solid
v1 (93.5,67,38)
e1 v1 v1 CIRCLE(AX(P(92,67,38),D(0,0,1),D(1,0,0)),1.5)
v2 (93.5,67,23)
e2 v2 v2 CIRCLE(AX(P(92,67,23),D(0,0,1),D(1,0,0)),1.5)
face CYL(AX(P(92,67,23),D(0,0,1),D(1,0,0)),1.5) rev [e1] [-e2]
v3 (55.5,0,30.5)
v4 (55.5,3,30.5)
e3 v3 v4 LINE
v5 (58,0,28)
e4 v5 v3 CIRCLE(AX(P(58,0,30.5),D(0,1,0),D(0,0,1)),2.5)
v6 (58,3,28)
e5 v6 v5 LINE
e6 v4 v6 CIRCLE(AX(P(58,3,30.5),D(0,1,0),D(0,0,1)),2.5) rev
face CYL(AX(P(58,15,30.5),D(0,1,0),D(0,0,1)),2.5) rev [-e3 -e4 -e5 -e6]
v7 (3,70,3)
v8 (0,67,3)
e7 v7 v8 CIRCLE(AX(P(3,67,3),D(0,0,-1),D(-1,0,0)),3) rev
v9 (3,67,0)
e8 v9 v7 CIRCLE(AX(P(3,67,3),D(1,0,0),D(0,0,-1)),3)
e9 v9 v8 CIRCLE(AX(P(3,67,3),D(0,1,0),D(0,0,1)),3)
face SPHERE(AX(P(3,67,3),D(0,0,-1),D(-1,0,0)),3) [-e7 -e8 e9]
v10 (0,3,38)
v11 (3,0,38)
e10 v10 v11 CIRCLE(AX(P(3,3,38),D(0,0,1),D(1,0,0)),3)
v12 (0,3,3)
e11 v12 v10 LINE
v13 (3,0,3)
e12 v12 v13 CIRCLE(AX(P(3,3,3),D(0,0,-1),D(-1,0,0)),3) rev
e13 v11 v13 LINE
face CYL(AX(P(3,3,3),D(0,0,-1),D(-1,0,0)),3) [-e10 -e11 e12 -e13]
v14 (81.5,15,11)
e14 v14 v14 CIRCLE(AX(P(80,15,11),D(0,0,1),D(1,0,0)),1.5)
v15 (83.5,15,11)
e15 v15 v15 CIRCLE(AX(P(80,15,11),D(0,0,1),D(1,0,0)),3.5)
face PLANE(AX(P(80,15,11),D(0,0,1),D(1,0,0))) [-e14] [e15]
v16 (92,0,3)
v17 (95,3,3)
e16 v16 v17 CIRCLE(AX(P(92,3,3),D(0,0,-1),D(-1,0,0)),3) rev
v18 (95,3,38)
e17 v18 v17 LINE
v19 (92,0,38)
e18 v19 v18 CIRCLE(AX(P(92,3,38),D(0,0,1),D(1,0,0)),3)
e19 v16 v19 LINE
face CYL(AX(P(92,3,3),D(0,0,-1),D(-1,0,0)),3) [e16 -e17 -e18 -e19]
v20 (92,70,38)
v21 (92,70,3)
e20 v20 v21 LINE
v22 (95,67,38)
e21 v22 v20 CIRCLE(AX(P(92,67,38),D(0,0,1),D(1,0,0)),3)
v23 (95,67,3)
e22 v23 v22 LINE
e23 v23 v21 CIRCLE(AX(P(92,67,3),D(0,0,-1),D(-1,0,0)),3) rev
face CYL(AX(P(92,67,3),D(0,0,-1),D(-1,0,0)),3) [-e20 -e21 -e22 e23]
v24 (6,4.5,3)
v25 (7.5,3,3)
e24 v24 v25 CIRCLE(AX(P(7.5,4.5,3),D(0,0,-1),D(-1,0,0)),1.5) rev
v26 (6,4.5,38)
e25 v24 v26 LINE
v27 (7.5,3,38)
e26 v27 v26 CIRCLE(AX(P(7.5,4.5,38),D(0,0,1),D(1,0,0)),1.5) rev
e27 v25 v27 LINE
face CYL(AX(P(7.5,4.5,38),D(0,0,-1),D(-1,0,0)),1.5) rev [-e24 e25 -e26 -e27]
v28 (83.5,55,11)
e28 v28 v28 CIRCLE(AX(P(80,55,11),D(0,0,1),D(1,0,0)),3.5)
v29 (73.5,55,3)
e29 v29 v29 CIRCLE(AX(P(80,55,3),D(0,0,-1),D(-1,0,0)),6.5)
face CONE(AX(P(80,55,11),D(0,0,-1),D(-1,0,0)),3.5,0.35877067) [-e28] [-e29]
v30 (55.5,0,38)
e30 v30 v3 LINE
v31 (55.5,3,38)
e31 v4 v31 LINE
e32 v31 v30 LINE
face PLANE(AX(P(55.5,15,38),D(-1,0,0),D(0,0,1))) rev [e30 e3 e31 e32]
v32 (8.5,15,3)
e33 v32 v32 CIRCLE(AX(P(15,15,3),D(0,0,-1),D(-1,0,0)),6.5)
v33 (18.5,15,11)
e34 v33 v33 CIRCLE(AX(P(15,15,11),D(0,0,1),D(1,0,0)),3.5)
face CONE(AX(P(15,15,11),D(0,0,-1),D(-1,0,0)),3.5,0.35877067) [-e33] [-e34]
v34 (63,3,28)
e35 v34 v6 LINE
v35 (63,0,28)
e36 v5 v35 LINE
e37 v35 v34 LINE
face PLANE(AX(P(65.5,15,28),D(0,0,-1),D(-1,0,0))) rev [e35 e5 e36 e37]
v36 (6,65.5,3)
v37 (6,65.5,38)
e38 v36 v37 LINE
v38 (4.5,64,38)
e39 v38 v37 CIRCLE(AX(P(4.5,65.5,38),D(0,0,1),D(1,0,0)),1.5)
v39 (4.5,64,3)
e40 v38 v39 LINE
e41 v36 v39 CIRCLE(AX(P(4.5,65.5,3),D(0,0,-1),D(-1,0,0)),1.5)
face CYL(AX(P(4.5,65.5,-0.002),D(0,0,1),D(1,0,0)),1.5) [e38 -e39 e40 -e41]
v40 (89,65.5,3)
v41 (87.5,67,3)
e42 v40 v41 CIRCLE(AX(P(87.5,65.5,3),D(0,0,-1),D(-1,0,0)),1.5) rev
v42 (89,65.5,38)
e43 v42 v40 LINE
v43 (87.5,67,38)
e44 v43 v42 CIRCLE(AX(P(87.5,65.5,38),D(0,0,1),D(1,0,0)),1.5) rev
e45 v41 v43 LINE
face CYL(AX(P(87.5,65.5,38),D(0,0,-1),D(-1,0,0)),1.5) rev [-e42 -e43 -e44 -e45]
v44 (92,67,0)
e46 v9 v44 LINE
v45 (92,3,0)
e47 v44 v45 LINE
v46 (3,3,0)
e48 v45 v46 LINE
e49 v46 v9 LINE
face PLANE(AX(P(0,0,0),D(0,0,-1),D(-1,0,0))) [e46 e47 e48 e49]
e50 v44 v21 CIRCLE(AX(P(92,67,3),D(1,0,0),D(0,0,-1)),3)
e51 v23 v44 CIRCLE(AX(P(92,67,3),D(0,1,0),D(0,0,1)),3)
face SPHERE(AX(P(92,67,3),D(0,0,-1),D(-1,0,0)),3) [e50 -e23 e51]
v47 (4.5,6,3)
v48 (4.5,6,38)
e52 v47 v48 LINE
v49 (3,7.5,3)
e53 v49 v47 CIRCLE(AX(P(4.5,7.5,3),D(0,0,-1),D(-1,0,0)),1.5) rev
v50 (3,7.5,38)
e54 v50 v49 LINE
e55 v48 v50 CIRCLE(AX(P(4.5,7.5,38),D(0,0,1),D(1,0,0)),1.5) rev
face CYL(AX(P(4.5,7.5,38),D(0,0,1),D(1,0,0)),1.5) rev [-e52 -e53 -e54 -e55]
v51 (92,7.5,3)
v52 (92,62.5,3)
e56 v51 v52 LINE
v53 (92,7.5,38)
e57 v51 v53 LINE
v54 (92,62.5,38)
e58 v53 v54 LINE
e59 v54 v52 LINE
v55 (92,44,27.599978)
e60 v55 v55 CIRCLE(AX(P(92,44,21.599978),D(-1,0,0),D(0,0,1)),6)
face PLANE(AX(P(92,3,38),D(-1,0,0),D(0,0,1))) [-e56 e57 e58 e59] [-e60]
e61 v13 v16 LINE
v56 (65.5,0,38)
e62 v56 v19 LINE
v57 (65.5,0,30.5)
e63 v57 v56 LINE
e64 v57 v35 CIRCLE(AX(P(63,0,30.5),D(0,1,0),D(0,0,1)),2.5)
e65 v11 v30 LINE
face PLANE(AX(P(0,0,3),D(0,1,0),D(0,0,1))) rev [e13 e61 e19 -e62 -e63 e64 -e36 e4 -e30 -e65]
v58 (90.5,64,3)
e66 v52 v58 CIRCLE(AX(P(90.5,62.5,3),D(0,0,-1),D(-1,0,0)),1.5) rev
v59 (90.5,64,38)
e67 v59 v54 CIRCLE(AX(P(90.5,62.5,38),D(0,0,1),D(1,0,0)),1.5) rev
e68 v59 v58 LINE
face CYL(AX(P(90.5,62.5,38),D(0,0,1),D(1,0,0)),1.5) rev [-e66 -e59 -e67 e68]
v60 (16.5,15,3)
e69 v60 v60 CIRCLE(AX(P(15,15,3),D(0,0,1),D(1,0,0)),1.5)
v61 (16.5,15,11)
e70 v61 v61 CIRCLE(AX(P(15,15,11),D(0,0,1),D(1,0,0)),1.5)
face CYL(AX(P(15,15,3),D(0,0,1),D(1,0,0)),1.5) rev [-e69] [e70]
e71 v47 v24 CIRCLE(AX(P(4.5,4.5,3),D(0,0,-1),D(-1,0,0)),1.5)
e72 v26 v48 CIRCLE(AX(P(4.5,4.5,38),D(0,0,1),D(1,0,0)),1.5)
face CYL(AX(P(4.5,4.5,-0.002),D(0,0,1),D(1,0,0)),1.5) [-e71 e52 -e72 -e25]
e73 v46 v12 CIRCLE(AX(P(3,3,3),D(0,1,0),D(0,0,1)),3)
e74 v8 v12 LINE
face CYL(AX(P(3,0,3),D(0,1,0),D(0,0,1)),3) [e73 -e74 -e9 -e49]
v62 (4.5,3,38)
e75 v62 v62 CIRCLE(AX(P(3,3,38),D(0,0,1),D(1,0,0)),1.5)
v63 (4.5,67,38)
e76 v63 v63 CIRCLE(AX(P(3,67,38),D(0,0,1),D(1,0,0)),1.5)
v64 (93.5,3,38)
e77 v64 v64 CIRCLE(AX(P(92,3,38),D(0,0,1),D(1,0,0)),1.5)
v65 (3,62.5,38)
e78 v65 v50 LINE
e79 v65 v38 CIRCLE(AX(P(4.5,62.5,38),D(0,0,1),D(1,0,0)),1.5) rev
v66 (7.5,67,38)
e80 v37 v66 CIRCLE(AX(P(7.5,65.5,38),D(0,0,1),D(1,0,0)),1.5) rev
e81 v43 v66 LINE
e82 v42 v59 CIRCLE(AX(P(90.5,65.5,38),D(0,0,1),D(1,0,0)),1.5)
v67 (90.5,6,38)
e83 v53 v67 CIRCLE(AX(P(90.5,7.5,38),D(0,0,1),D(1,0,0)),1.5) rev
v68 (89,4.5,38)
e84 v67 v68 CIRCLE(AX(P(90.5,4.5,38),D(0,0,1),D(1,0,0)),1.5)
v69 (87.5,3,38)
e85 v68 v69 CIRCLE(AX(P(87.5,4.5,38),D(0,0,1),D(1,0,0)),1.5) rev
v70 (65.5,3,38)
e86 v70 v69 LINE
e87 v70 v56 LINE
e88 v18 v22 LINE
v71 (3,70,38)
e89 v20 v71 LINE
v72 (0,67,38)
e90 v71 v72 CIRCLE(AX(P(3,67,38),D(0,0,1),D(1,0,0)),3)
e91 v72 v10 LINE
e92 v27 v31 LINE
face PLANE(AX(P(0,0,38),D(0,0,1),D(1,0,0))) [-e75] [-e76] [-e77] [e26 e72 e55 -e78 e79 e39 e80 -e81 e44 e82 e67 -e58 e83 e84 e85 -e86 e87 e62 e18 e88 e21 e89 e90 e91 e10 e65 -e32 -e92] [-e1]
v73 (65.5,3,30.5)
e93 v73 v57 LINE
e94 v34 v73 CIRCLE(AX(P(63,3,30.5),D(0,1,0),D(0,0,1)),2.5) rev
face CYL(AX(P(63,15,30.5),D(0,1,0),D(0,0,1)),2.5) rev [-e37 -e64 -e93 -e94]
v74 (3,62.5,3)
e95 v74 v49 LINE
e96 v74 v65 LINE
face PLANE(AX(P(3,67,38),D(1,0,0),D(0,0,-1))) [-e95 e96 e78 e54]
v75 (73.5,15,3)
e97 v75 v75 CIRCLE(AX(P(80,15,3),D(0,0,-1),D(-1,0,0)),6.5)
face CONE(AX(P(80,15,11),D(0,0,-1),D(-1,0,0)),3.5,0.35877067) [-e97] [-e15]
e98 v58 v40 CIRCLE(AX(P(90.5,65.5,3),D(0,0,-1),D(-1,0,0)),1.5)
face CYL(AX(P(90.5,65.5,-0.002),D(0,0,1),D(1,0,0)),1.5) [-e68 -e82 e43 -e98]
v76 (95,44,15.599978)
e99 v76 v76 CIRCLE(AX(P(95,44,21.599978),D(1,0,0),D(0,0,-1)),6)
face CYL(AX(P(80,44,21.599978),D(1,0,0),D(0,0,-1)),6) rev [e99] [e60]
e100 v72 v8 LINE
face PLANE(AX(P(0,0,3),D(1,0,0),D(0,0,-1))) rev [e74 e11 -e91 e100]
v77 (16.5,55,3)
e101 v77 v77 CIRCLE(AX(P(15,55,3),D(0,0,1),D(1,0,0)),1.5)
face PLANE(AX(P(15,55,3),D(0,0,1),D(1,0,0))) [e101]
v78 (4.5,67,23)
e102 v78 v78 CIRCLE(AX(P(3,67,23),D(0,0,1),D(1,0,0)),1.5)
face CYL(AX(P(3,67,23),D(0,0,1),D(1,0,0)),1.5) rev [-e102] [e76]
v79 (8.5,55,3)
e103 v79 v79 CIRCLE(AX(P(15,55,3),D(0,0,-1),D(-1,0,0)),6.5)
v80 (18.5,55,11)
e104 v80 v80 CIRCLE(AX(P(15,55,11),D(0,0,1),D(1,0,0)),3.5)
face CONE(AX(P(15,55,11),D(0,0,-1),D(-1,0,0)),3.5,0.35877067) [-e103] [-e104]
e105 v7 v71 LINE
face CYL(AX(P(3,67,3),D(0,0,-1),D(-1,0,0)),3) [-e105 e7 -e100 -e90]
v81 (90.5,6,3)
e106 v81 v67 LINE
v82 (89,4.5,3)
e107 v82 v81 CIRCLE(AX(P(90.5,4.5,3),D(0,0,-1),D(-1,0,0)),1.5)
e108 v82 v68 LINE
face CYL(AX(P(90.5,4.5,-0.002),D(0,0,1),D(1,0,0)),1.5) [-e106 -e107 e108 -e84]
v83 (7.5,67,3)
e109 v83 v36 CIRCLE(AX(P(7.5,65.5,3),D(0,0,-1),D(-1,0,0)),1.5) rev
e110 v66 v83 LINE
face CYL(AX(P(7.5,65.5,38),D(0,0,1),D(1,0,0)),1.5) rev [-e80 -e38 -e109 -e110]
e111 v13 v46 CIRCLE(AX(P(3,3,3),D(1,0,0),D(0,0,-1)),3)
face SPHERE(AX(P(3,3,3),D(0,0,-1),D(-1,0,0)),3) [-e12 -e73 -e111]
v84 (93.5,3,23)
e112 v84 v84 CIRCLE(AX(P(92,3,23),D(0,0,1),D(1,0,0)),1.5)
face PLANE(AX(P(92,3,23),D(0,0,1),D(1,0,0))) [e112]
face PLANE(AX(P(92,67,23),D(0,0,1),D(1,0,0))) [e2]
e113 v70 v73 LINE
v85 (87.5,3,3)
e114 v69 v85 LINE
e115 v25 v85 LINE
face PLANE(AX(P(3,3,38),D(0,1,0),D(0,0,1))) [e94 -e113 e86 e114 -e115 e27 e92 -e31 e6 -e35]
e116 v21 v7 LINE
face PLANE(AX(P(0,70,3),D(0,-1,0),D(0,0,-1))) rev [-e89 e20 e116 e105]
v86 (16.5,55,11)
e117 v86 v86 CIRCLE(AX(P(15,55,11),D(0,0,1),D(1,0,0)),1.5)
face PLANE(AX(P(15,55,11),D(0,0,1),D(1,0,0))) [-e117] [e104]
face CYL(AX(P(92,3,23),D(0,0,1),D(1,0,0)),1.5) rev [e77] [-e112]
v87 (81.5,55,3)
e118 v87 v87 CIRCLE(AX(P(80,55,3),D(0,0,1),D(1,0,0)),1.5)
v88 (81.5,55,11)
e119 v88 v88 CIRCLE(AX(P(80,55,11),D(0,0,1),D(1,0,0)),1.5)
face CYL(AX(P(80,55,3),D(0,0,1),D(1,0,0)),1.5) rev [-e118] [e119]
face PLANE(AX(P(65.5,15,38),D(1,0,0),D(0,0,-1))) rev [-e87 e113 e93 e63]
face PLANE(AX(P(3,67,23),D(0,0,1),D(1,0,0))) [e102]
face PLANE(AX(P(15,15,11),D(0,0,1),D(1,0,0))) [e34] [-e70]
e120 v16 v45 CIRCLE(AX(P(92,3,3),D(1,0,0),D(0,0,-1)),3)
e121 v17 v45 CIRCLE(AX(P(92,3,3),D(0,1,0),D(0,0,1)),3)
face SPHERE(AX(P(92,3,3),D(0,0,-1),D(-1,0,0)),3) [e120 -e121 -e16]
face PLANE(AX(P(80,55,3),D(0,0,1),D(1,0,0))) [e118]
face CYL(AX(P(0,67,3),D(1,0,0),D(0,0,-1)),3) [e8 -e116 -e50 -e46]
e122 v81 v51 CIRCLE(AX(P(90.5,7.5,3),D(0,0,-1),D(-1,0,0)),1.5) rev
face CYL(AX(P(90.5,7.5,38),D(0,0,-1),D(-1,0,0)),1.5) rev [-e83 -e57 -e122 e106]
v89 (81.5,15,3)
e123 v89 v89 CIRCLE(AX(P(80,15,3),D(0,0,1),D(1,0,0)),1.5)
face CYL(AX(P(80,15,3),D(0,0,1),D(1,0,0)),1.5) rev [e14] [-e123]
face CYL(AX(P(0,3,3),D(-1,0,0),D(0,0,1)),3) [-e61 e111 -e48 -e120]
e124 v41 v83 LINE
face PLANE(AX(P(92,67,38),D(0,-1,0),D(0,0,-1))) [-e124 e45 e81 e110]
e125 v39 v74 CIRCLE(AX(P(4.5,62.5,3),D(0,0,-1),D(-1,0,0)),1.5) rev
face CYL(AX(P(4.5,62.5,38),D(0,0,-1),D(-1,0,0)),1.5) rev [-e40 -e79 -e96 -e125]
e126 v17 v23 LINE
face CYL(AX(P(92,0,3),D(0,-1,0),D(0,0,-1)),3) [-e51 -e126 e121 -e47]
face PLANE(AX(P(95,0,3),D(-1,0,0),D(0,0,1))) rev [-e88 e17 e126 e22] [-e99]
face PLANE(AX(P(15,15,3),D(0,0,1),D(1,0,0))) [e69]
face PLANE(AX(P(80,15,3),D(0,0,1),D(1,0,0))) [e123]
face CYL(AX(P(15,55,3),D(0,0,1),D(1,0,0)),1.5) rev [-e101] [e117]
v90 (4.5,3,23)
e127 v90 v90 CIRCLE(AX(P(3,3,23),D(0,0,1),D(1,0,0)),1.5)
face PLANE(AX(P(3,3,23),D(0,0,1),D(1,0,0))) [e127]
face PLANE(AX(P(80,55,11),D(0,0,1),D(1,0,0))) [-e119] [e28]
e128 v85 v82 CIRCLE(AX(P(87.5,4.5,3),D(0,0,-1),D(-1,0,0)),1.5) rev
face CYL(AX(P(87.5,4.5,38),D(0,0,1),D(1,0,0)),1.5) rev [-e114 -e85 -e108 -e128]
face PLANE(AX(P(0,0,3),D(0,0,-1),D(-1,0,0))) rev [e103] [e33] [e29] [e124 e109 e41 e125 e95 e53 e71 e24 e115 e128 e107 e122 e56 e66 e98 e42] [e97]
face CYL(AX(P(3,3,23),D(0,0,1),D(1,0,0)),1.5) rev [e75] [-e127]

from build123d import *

# Parameters (mm, degrees)
SKETCH_1_W          = 95
SKETCH_1_H          = 70
EXTRUDE_1_DEPTH     = 3
SKETCH_2_R          = 3.5
EXTRUDE_2_DEPTH     = 8
SKETCH_3_R          = 1.5
CUT_EXTRUDE_1_DEPTH = 8
CHAMFER_2_SIZE      = 3
CHAMFER_2_SIZE_2    = 8
SKETCH_6_W          = 95
SKETCH_6_H          = 70
SKETCH_6_W_2        = 89
SKETCH_6_H_2        = 64
EXTRUDE_3_DEPTH     = 35
SKETCH_8_W          = 6
SKETCH_8_H          = 6
EXTRUDE_4_DEPTH     = 35
FILLET_4_R          = 1.5
SKETCH_10_R         = 1.5
CUT_EXTRUDE_2_DEPTH = 15
FILLET_6_R          = 3
SKETCH_11_R         = 6
CUT_EXTRUDE_3_DEPTH = 15
SKETCH_12_W         = 10
SKETCH_12_H         = 10
CUT_EXTRUDE_4_DEPTH = 15
FILLET_9_R          = 2.5
FILLET_10_R         = 3


# Some blends are built 0.0001 mm under size
with BuildPart() as part:
    # ｽｹｯﾁ1 → ﾎﾞｽ - 押し出し1 (new body)
    with BuildSketch(Plane.XY):
        with Locations((47.5, 35)):
            Rectangle(SKETCH_1_W, SKETCH_1_H)
    extrude(amount=EXTRUDE_1_DEPTH)

    # ｽｹｯﾁ2 → ﾎﾞｽ - 押し出し2 (add)
    with BuildSketch(Plane.XY.offset(3)):
        with Locations(Location((15, 55, 0), (0, 0, 180))):
            Circle(SKETCH_2_R)
        with Locations(Location((15, 15, 0), (0, 0, 180))):
            Circle(SKETCH_2_R)
        with Locations(Location((80, 55, 0), (0, 0, 180))):
            Circle(SKETCH_2_R)
        with Locations(Location((80, 15, 0), (0, 0, 180))):
            Circle(SKETCH_2_R)
    extrude(amount=EXTRUDE_2_DEPTH)

    # ｽｹｯﾁ3 → ｶｯﾄ - 押し出し1 (cut)
    with BuildSketch(Plane.XY.offset(11)):
        with Locations((15, 55)):
            Circle(SKETCH_3_R)
        with Locations((80, 55)):
            Circle(SKETCH_3_R)
        with Locations((15, 15)):
            Circle(SKETCH_3_R)
        with Locations((80, 15)):
            Circle(SKETCH_3_R)
    extrude(amount=-CUT_EXTRUDE_1_DEPTH, mode=Mode.SUBTRACT)

    # 面取り2
    # the kernel refuses this chamfer: 8, 3 mm, written as the material it adds along each edge
    with BuildSketch(Plane(origin=(15, 55, 3), x_dir=(-1, 0, 0), z_dir=(0, 1, 0))) as chamfer_2_piece_1_section:
        Polygon((3.5 + CHAMFER_2_SIZE, 0), (3.5, CHAMFER_2_SIZE_2), (3.5, 0), align=None)
    chamfer_2_piece_1 = revolve(axis=Axis((15, 55, 3), (0, 0, 1)), mode=Mode.PRIVATE)
    chamfer_2_piece_1 = split(chamfer_2_piece_1, bisect_by=Plane(origin=(19.987700919, 55, 11), z_dir=(0, 0, -1)), keep=Keep.TOP, mode=Mode.PRIVATE)
    add(chamfer_2_piece_1)
    with BuildSketch(Plane(origin=(15, 15, 3), x_dir=(-1, 0, 0), z_dir=(0, 1, 0))) as chamfer_2_piece_2_section:
        Polygon((3.5 + CHAMFER_2_SIZE, 0), (3.5, CHAMFER_2_SIZE_2), (3.5, 0), align=None)
    chamfer_2_piece_2 = revolve(axis=Axis((15, 15, 3), (0, 0, 1)), mode=Mode.PRIVATE)
    chamfer_2_piece_2 = split(chamfer_2_piece_2, bisect_by=Plane(origin=(19.987700919, 15, 11), z_dir=(0, 0, -1)), keep=Keep.TOP, mode=Mode.PRIVATE)
    add(chamfer_2_piece_2)
    with BuildSketch(Plane(origin=(80, 55, 3), x_dir=(-1, 0, 0), z_dir=(0, 1, 0))) as chamfer_2_piece_3_section:
        Polygon((3.5 + CHAMFER_2_SIZE, 0), (3.5, CHAMFER_2_SIZE_2), (3.5, 0), align=None)
    chamfer_2_piece_3 = revolve(axis=Axis((80, 55, 3), (0, 0, 1)), mode=Mode.PRIVATE)
    chamfer_2_piece_3 = split(chamfer_2_piece_3, bisect_by=Plane(origin=(84.987700919, 55, 11), z_dir=(0, 0, -1)), keep=Keep.TOP, mode=Mode.PRIVATE)
    add(chamfer_2_piece_3)
    with BuildSketch(Plane(origin=(80, 15, 3), x_dir=(-1, 0, 0), z_dir=(0, 1, 0))) as chamfer_2_piece_4_section:
        Polygon((3.5 + CHAMFER_2_SIZE, 0), (3.5, CHAMFER_2_SIZE_2), (3.5, 0), align=None)
    chamfer_2_piece_4 = revolve(axis=Axis((80, 15, 3), (0, 0, 1)), mode=Mode.PRIVATE)
    chamfer_2_piece_4 = split(chamfer_2_piece_4, bisect_by=Plane(origin=(84.987700919, 15, 11), z_dir=(0, 0, -1)), keep=Keep.TOP, mode=Mode.PRIVATE)
    add(chamfer_2_piece_4)

    # ｽｹｯﾁ6 → ﾎﾞｽ - 押し出し3 (add)
    with BuildSketch(Plane.XY.offset(3)):
        with Locations((47.5, 35)):
            Rectangle(SKETCH_6_W, SKETCH_6_H)
        with Locations((47.5, 35)):
            Rectangle(SKETCH_6_W_2, SKETCH_6_H_2, mode=Mode.SUBTRACT)
    extrude(amount=EXTRUDE_3_DEPTH)

    # ｽｹｯﾁ8 → ﾎﾞｽ - 押し出し4 (add)
    with BuildSketch(Plane.XY.offset(38)):
        with Locations((3, 67)):
            Rectangle(SKETCH_8_W, SKETCH_8_H)
        with Locations((92, 67)):
            Rectangle(SKETCH_8_W, SKETCH_8_H)
        with Locations((3, 3)):
            Rectangle(SKETCH_8_W, SKETCH_8_H)
        with Locations((92, 3)):
            Rectangle(SKETCH_8_W, SKETCH_8_H)
    extrude(amount=-EXTRUDE_4_DEPTH)

    # ﾌｨﾚｯﾄ4
    fillet_4_edges = [part.edges().sort_by_distance(p)[0] for p in [
        (92, 6, 20.5),
        (89, 6, 20.5),
        (89, 3, 20.5),
        (6, 3, 20.5),
        (6, 6, 20.5),
        (3, 6, 20.5),
        (92, 64, 20.5),
        (89, 64, 20.5),
        (89, 67, 20.5),
        (6, 64, 20.5),
        (6, 67, 20.5),
        (3, 64, 20.5),
    ]]
    fillet(fillet_4_edges, radius=FILLET_4_R - 0.0001)  # a hair under: the kernel refuses the full size

    # ｽｹｯﾁ10 → ｶｯﾄ - 押し出し2 (cut)
    with BuildSketch(Plane.XY.offset(38)):
        with Locations((3, 67)):
            Circle(SKETCH_10_R)
        with Locations((92, 67)):
            Circle(SKETCH_10_R)
        with Locations((3, 3)):
            Circle(SKETCH_10_R)
        with Locations((92, 3)):
            Circle(SKETCH_10_R)
    extrude(amount=-CUT_EXTRUDE_2_DEPTH, mode=Mode.SUBTRACT)

    # ﾌｨﾚｯﾄ6
    fillet_6_edges = [part.edges().sort_by_distance(p)[0] for p in [
        (0, 70, 19),
        (95, 70, 19),
        (95, 0, 19),
        (0, 0, 19),
    ]]
    fillet(fillet_6_edges, radius=FILLET_6_R)

    # ｽｹｯﾁ11 → ｶｯﾄ - 押し出し3 (cut)
    with BuildSketch(Plane(origin=(95, 0, 0), x_dir=(0, 0, -1), z_dir=(1, 0, 0))):
        with Locations((-21.599978, 44)):
            Circle(SKETCH_11_R)
    extrude(amount=-CUT_EXTRUDE_3_DEPTH, mode=Mode.SUBTRACT)

    # ｽｹｯﾁ12 → ｶｯﾄ - 押し出し4 (cut)
    with BuildSketch(Plane.XZ):
        with Locations((60.5, 33)):
            Rectangle(SKETCH_12_W, SKETCH_12_H)
    extrude(amount=-CUT_EXTRUDE_4_DEPTH, mode=Mode.SUBTRACT)

    # ﾌｨﾚｯﾄ9
    fillet_9_edges = [part.edges().sort_by_distance(p)[0] for p in [
        (65.5, 1.5, 28),
        (55.5, 1.5, 28),
    ]]
    fillet(fillet_9_edges, radius=FILLET_9_R)

    # ﾌｨﾚｯﾄ10
    fillet_10_edges = [part.edges().sort_by_distance(p)[0] for p in [
        (47.5, 0, 0),
        (0, 35, 0),
        (47.5, 70, 0),
        (95, 35, 0),
        (0.878679656, 69.121320344, 0),
        (94.121320344, 69.121320344, 0),
        (94.121320344, 0.878679656, 0),
        (0.878679656, 0.878679656, 0),
    ]]
    fillet(fillet_10_edges, radius=FILLET_10_R)


solid = part.part
